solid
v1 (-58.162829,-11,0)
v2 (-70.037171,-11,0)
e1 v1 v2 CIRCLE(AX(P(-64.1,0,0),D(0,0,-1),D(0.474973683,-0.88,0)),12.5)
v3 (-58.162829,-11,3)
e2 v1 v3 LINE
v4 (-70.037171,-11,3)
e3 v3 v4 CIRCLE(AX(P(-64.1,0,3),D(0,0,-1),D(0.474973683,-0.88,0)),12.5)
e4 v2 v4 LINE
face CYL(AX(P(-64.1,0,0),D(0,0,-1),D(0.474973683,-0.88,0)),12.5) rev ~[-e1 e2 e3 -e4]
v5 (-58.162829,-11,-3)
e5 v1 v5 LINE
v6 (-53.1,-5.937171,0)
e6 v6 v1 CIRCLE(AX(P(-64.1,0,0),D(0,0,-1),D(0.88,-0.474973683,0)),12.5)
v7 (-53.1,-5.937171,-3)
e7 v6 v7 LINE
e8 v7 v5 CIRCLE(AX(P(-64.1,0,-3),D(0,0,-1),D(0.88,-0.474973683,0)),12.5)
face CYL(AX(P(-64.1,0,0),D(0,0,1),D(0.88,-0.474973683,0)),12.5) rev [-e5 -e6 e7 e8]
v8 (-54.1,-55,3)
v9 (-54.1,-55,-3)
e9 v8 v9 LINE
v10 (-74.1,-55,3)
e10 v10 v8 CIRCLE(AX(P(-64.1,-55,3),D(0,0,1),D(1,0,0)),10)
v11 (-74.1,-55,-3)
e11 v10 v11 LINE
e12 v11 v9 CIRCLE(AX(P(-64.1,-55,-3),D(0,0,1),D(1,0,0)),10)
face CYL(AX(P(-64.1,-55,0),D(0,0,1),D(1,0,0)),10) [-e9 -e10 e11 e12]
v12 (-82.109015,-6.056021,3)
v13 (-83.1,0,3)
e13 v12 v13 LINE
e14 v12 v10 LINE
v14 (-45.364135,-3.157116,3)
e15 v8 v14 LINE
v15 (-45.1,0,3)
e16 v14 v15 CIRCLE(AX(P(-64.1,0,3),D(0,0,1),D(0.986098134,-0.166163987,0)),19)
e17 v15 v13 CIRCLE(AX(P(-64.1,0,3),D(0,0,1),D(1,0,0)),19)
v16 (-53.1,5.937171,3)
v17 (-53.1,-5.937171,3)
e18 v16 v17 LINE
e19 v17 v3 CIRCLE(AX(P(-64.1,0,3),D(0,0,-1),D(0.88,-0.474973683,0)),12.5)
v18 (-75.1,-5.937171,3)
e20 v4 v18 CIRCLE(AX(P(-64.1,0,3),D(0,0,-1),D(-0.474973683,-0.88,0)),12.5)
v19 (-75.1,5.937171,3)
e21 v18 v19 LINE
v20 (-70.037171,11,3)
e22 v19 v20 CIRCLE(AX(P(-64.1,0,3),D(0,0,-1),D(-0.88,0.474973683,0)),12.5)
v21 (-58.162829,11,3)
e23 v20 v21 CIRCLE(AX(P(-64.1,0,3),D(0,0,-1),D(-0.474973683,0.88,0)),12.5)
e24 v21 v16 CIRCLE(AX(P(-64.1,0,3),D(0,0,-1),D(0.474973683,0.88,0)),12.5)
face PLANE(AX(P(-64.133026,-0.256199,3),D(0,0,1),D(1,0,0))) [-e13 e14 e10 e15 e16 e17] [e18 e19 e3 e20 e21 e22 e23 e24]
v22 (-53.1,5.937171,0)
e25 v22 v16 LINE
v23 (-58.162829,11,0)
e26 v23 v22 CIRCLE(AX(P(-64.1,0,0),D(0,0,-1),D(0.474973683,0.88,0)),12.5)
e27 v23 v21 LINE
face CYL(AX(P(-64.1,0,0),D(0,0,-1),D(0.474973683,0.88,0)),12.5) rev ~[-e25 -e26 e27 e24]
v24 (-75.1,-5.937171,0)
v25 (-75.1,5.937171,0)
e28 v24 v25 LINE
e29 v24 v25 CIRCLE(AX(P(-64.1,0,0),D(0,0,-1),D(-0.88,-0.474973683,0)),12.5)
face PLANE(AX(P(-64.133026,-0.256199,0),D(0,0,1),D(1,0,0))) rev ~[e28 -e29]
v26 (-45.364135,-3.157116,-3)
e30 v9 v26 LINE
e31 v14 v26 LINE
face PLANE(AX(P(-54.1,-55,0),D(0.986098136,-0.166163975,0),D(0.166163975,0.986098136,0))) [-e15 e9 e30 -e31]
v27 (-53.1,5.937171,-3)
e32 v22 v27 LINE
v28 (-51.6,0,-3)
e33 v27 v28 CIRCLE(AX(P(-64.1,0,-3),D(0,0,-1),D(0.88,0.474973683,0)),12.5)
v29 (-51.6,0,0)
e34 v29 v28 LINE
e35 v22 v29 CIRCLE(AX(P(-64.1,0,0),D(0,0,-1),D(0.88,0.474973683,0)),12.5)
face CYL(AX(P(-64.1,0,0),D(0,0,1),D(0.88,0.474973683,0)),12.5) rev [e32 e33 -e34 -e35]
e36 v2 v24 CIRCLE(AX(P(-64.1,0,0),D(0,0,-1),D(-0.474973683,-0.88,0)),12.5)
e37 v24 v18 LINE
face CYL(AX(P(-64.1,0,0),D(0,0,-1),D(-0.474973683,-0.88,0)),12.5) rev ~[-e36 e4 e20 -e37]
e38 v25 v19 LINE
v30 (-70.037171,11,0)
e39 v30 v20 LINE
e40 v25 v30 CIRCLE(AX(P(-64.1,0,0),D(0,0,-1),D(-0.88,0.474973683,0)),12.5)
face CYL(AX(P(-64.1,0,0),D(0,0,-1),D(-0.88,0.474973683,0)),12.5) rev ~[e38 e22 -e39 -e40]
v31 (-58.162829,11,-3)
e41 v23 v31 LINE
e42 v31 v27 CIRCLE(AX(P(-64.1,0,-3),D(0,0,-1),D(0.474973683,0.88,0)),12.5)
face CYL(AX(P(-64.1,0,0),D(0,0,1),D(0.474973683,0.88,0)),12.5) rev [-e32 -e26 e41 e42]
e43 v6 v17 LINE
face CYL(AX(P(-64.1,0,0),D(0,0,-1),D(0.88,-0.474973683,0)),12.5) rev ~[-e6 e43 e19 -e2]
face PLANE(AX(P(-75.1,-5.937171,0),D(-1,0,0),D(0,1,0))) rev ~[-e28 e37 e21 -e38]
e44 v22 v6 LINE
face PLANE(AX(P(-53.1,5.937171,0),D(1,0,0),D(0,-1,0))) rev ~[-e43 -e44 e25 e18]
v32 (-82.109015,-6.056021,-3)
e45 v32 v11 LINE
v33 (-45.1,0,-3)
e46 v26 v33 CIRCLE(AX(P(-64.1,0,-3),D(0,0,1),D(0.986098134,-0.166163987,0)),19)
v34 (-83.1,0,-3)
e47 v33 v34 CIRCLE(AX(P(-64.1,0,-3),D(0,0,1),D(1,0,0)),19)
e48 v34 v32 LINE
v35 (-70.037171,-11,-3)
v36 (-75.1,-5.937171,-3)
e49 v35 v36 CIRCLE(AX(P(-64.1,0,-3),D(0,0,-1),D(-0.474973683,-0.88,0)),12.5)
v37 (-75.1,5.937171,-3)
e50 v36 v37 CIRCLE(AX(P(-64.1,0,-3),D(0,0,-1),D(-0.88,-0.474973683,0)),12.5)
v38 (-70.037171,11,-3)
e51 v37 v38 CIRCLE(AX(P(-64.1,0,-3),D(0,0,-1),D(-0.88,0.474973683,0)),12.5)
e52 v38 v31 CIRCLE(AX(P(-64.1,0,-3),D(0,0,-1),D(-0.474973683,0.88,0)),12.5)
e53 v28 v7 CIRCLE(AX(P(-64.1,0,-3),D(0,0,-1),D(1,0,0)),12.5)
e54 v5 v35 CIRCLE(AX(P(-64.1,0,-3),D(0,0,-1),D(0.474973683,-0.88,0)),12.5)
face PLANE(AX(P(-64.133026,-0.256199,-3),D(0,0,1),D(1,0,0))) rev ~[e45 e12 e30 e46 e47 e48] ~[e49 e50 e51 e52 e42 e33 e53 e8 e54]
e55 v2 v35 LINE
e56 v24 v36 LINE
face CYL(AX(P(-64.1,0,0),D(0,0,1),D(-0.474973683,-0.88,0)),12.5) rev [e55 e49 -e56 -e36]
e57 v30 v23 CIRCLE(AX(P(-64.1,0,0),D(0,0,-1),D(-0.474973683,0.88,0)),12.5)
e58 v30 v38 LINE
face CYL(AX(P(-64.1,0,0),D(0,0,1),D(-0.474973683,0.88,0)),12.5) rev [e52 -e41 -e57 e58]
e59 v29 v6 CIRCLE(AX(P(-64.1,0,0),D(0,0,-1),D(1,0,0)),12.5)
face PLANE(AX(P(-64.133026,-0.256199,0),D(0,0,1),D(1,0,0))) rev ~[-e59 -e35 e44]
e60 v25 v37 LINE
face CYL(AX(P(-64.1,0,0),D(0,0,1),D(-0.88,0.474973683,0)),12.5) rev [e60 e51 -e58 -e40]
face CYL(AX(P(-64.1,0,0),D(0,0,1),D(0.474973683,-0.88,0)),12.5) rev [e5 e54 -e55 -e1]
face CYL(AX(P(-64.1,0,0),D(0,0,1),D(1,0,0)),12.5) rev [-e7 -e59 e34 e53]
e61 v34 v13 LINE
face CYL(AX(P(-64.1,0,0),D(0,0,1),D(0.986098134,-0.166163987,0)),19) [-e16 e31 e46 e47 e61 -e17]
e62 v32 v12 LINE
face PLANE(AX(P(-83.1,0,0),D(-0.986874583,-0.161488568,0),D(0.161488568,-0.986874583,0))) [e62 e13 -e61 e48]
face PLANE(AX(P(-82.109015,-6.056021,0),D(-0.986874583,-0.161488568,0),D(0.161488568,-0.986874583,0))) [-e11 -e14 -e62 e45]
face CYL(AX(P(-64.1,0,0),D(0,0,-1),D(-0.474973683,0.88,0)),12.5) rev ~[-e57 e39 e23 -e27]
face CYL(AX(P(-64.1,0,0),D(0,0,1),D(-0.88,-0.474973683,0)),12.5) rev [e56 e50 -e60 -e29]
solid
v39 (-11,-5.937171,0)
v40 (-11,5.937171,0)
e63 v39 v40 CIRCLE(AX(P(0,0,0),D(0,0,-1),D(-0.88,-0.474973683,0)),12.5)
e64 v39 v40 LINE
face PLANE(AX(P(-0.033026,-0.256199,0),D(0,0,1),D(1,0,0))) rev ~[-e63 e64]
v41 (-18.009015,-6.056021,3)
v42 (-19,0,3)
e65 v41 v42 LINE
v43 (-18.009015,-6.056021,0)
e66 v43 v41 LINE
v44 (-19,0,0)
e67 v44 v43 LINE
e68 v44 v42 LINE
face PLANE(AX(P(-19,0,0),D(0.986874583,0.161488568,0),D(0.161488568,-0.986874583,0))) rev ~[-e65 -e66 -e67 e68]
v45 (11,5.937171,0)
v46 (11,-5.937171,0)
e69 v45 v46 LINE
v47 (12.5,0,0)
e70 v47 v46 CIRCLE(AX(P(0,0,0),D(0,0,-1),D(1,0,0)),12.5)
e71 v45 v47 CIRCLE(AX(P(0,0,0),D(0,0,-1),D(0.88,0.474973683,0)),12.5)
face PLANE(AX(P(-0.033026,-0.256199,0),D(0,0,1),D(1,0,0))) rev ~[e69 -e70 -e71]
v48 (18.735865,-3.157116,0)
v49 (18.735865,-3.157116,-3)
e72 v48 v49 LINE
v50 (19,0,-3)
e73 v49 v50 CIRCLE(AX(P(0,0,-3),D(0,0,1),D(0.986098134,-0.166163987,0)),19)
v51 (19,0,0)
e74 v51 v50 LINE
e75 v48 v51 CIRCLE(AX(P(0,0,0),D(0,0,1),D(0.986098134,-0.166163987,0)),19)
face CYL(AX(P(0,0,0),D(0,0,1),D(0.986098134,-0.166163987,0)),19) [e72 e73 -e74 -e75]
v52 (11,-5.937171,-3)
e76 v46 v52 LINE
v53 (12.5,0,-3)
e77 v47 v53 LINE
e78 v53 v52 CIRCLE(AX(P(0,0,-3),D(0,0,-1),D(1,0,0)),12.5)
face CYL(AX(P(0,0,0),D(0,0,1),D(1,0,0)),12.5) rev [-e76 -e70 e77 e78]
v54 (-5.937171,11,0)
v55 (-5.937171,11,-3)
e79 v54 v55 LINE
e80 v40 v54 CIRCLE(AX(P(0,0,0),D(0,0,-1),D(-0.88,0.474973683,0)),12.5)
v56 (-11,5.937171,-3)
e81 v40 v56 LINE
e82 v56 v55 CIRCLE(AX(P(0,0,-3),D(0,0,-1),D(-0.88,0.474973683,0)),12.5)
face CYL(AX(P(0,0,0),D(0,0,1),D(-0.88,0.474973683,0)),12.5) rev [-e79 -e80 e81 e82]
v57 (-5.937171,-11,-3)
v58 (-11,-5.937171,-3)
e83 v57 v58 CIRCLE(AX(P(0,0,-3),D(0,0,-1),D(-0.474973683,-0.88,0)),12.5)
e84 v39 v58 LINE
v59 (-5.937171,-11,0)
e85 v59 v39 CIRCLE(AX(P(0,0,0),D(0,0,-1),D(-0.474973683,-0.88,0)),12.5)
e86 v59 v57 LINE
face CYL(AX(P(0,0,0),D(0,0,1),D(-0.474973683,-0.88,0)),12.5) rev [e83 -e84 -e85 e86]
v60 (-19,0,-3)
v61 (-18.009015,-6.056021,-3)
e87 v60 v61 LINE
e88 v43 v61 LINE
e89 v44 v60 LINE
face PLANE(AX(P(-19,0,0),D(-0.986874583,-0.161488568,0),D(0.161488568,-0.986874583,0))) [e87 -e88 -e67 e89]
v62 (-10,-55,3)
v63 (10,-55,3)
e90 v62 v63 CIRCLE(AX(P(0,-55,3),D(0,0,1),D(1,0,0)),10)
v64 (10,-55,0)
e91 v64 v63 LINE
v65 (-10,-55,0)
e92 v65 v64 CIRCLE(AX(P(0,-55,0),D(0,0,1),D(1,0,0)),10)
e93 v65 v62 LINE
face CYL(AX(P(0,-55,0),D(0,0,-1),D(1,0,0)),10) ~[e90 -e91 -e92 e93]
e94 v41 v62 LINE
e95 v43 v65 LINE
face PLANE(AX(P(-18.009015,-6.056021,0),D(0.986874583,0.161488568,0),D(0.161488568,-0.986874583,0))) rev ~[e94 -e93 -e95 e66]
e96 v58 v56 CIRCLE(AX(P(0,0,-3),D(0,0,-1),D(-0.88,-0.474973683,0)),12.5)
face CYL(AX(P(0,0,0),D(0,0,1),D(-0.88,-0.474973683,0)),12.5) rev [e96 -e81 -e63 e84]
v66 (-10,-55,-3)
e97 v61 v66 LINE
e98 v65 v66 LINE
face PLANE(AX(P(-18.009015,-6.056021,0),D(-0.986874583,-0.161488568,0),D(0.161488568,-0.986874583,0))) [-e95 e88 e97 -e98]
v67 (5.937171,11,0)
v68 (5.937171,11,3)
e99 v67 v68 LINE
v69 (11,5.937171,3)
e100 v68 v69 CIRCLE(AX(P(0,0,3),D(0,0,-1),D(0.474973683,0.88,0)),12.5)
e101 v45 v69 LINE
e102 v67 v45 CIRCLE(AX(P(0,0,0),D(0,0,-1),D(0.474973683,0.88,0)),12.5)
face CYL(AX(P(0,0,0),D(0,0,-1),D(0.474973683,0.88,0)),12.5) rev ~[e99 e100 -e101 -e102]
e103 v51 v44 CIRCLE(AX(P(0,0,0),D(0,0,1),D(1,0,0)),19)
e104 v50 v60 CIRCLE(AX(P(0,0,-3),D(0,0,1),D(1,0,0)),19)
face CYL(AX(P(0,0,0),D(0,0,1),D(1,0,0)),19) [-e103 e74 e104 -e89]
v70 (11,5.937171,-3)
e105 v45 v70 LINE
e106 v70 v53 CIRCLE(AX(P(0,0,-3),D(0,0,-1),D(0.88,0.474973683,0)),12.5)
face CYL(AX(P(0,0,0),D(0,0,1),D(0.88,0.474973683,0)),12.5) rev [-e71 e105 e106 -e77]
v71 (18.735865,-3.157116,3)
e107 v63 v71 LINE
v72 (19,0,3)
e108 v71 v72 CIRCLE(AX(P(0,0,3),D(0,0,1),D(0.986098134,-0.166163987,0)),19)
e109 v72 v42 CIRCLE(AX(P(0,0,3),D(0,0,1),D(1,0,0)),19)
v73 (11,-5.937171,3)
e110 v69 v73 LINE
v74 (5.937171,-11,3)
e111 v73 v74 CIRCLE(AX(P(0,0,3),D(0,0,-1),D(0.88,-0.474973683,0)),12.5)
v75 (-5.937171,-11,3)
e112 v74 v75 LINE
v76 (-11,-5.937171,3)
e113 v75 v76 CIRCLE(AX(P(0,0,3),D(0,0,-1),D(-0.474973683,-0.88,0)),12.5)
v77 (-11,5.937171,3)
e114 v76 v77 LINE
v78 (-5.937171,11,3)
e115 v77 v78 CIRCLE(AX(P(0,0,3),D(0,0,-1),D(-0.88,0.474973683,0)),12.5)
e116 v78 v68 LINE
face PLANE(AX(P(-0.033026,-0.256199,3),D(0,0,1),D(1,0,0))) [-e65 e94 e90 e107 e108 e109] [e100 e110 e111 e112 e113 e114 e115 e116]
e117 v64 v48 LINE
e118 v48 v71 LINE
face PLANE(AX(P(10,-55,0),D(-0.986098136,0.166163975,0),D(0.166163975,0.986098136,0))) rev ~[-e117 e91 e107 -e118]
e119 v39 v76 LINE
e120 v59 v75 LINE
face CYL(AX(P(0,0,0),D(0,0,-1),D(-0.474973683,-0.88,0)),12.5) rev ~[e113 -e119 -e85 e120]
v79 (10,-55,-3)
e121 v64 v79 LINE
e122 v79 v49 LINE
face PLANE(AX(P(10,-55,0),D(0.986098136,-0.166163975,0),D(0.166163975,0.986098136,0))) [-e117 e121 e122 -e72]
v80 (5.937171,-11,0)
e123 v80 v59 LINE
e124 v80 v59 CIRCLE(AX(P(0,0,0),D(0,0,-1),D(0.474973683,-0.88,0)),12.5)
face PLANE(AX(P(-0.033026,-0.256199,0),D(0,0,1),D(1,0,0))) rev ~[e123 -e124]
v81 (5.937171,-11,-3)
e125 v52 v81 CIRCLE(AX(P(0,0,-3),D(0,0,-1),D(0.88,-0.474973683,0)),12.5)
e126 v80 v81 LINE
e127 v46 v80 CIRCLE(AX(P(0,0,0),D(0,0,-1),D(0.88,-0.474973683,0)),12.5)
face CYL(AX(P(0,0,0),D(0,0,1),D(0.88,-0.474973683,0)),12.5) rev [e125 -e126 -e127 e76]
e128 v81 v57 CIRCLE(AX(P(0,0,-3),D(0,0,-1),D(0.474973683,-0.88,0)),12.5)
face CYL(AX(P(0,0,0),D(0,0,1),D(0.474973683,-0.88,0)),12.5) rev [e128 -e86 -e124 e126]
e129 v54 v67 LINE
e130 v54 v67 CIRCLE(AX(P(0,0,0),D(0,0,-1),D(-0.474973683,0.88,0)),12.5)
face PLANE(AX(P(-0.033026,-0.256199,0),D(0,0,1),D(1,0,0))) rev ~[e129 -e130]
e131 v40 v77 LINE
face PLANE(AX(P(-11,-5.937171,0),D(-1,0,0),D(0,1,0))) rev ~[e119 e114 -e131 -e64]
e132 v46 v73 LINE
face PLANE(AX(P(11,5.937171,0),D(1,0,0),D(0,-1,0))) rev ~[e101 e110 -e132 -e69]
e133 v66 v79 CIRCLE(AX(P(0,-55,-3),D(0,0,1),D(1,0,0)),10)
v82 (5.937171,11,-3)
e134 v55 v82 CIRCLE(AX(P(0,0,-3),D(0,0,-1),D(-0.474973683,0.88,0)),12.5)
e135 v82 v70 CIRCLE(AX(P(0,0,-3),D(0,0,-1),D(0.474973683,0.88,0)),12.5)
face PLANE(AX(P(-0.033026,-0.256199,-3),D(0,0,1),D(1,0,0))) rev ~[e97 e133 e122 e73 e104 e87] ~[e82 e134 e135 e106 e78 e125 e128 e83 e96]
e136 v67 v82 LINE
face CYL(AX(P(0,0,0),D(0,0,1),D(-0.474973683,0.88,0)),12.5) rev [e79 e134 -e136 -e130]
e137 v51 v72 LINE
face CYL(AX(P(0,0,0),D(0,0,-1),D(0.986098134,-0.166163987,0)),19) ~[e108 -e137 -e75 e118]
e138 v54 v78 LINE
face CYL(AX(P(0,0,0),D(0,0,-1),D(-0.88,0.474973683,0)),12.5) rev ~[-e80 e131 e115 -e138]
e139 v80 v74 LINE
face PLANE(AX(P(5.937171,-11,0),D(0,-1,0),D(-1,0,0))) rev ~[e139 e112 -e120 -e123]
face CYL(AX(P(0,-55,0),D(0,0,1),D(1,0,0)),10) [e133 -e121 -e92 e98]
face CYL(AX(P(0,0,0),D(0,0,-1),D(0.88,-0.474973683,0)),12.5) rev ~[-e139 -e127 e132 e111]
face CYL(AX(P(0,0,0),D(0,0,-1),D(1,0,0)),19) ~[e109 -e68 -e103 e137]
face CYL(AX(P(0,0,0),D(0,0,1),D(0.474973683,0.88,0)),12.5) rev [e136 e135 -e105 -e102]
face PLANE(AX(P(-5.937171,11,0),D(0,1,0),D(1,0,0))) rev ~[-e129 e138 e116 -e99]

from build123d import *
from build123d import SkipClean  # not in build123d's __all__

# Parameters (mm, degrees)
F1_DEPTH = 3
F2_DEPTH = 3
F4_DEPTH = 25
F6_DEPTH = 25


with BuildPart() as f1:
    # F0 (on Top) → F1 (new body)
    with BuildSketch(Plane.XY):
        with BuildLine():
            ThreePointArc((18.7358645414, -3.1571157542), (18.9338509856, -1.5840728697), (19, 0))
            ThreePointArc((19, 0), (0, 19), (-19, 0))
            Line((-19, 0), (-18.00901481, -6.0560206053))
            ThreePointArc((-18.00901481, -6.0560206053), (1.4943192319, -18.9411459535), (18.7358645414, -3.1571157542))
        make_face()
        with BuildLine():
            Line((-11, 5.9371710435), (-11, 11))
            Line((-11, 11), (-5.9371710435, 11))
            ThreePointArc((-5.9371710435, 11), (0, 12.5), (5.9371710435, 11))
            Line((5.9371710435, 11), (11, 11))
            Line((11, 11), (11, 5.9371710435))
            ThreePointArc((11, 5.9371710435), (12.1191996435, 3.0618621785), (12.5, 0))
            ThreePointArc((12.5, 0), (12.1191996435, -3.0618621785), (11, -5.9371710435))
            Line((11, -5.9371710435), (11, -11))
            Line((11, -11), (5.9371710435, -11))
            ThreePointArc((5.9371710435, -11), (0, -12.5), (-5.9371710435, -11))
            Line((-5.9371710435, -11), (-11, -11))
            Line((-11, -11), (-11, -5.9371710435))
            ThreePointArc((-11, -5.9371710435), (-12.5, 0), (-11, 5.9371710435))
        make_face(mode=Mode.SUBTRACT)
        with BuildLine():
            Line((-18.00901481, -6.0560206053), (-19, 0))
            ThreePointArc((-19, 0), (-18.7506170751, -3.0682827941), (-18.00901481, -6.0560206053))
        make_face()
        with BuildLine():
            Line((10, -55), (18.7358645414, -3.1571157542))
            ThreePointArc((18.7358645414, -3.1571157542), (1.4943192319, -18.9411459535), (-18.00901481, -6.0560206053))
            Line((-18.00901481, -6.0560206053), (-10, -55))
            ThreePointArc((-10, -55), (0, -45), (10, -55))
        make_face()
        with BuildLine():
            ThreePointArc((-10, -55), (0, -65), (10, -55))
            ThreePointArc((10, -55), (0, -45), (-10, -55))
        make_face()
        with BuildLine():
            Line((-5.9371710435, 11), (-11, 11))
            Line((-11, 11), (-11, 5.9371710435))
            ThreePointArc((-11, 5.9371710435), (-8.8388347648, 8.8388347648), (-5.9371710435, 11))
        make_face()
        with BuildLine():
            ThreePointArc((5.9371710435, 11), (0, 12.5), (-5.9371710435, 11))
            Line((-5.9371710435, 11), (5.9371710435, 11))
        make_face()
        with BuildLine():
            Line((11, 11), (5.9371710435, 11))
            ThreePointArc((5.9371710435, 11), (8.8388347648, 8.8388347648), (11, 5.9371710435))
            Line((11, 5.9371710435), (11, 11))
        make_face()
        with BuildLine():
            Line((11, -11), (11, -5.9371710435))
            ThreePointArc((11, -5.9371710435), (8.8388347648, -8.8388347648), (5.9371710435, -11))
            Line((5.9371710435, -11), (11, -11))
        make_face()
        with BuildLine():
            ThreePointArc((12.5, 0), (12.1191996435, 3.0618621785), (11, 5.9371710435))
            Line((11, 5.9371710435), (11, -5.9371710435))
            ThreePointArc((11, -5.9371710435), (12.1191996435, -3.0618621785), (12.5, 0))
        make_face()
        with BuildLine():
            ThreePointArc((-5.9371710435, -11), (-8.8388347648, -8.8388347648), (-11, -5.9371710435))
            Line((-11, -5.9371710435), (-11, -11))
            Line((-11, -11), (-5.9371710435, -11))
        make_face()
        with BuildLine():
            Line((5.9371710435, -11), (-5.9371710435, -11))
            ThreePointArc((-5.9371710435, -11), (0, -12.5), (5.9371710435, -11))
        make_face()
        with BuildLine():
            Line((-11, -5.9371710435), (-11, 5.9371710435))
            ThreePointArc((-11, 5.9371710435), (-12.5, 0), (-11, -5.9371710435))
        make_face()
    extrude(amount=F1_DEPTH)

    # F0 (on Top) → F2 (join)
    with BuildSketch(Plane.XY):
        with BuildLine():
            ThreePointArc((18.7358645414, -3.1571157542), (18.9338509856, -1.5840728697), (19, 0))
            ThreePointArc((19, 0), (0, 19), (-19, 0))
            Line((-19, 0), (-18.00901481, -6.0560206053))
            ThreePointArc((-18.00901481, -6.0560206053), (1.4943192319, -18.9411459535), (18.7358645414, -3.1571157542))
        make_face()
        with BuildLine():
            Line((-11, 5.9371710435), (-11, 11))
            Line((-11, 11), (-5.9371710435, 11))
            ThreePointArc((-5.9371710435, 11), (0, 12.5), (5.9371710435, 11))
            Line((5.9371710435, 11), (11, 11))
            Line((11, 11), (11, 5.9371710435))
            ThreePointArc((11, 5.9371710435), (12.1191996435, 3.0618621785), (12.5, 0))
            ThreePointArc((12.5, 0), (12.1191996435, -3.0618621785), (11, -5.9371710435))
            Line((11, -5.9371710435), (11, -11))
            Line((11, -11), (5.9371710435, -11))
            ThreePointArc((5.9371710435, -11), (0, -12.5), (-5.9371710435, -11))
            Line((-5.9371710435, -11), (-11, -11))
            Line((-11, -11), (-11, -5.9371710435))
            ThreePointArc((-11, -5.9371710435), (-12.5, 0), (-11, 5.9371710435))
        make_face(mode=Mode.SUBTRACT)
        with BuildLine():
            Line((-5.9371710435, 11), (-11, 11))
            Line((-11, 11), (-11, 5.9371710435))
            ThreePointArc((-11, 5.9371710435), (-8.8388347648, 8.8388347648), (-5.9371710435, 11))
        make_face()
        with BuildLine():
            Line((11, 11), (5.9371710435, 11))
            ThreePointArc((5.9371710435, 11), (8.8388347648, 8.8388347648), (11, 5.9371710435))
            Line((11, 5.9371710435), (11, 11))
        make_face()
        with BuildLine():
            Line((11, -11), (11, -5.9371710435))
            ThreePointArc((11, -5.9371710435), (8.8388347648, -8.8388347648), (5.9371710435, -11))
            Line((5.9371710435, -11), (11, -11))
        make_face()
        with BuildLine():
            ThreePointArc((-5.9371710435, -11), (-8.8388347648, -8.8388347648), (-11, -5.9371710435))
            Line((-11, -5.9371710435), (-11, -11))
            Line((-11, -11), (-5.9371710435, -11))
        make_face()
        with BuildLine():
            Line((10, -55), (18.7358645414, -3.1571157542))
            ThreePointArc((18.7358645414, -3.1571157542), (1.4943192319, -18.9411459535), (-18.00901481, -6.0560206053))
            Line((-18.00901481, -6.0560206053), (-10, -55))
            ThreePointArc((-10, -55), (0, -45), (10, -55))
        make_face()
        with BuildLine():
            ThreePointArc((-10, -55), (0, -65), (10, -55))
            ThreePointArc((10, -55), (0, -45), (-10, -55))
        make_face()
    with SkipClean():  # cleaning this boolean's faces spoils the solid; the shape is the same uncleaned
        extrude(amount=-F2_DEPTH)

    # F3: union 

    # F4 (cut): a face of the model
    f4_faces = [f1.faces().sort_by_distance(p)[0] for p in [
        (-18.6030068603, -3.0441283953, 0),
    ]]
    with SkipClean():  # cleaning this boolean's faces spoils the solid; the shape is the same uncleaned
        extrude(f4_faces, amount=-F4_DEPTH, mode=Mode.SUBTRACT)


with BuildPart() as f5_1:
    # F5: copy of F1
    add(f1.part.moved(Location((-64.1, 0, 0))), clean=False)

    # F6 (cut): faces of the model
    f6_faces = [f5_1.faces().sort_by_distance(p)[0] for p in [
        (-64.1, 11.6031968432, 0),
        (-64.1, -11.6031968432, 0),
    ]]
    extrude(f6_faces, amount=-F6_DEPTH, mode=Mode.SUBTRACT)


solid = Compound([f1.part, f5_1.part])
